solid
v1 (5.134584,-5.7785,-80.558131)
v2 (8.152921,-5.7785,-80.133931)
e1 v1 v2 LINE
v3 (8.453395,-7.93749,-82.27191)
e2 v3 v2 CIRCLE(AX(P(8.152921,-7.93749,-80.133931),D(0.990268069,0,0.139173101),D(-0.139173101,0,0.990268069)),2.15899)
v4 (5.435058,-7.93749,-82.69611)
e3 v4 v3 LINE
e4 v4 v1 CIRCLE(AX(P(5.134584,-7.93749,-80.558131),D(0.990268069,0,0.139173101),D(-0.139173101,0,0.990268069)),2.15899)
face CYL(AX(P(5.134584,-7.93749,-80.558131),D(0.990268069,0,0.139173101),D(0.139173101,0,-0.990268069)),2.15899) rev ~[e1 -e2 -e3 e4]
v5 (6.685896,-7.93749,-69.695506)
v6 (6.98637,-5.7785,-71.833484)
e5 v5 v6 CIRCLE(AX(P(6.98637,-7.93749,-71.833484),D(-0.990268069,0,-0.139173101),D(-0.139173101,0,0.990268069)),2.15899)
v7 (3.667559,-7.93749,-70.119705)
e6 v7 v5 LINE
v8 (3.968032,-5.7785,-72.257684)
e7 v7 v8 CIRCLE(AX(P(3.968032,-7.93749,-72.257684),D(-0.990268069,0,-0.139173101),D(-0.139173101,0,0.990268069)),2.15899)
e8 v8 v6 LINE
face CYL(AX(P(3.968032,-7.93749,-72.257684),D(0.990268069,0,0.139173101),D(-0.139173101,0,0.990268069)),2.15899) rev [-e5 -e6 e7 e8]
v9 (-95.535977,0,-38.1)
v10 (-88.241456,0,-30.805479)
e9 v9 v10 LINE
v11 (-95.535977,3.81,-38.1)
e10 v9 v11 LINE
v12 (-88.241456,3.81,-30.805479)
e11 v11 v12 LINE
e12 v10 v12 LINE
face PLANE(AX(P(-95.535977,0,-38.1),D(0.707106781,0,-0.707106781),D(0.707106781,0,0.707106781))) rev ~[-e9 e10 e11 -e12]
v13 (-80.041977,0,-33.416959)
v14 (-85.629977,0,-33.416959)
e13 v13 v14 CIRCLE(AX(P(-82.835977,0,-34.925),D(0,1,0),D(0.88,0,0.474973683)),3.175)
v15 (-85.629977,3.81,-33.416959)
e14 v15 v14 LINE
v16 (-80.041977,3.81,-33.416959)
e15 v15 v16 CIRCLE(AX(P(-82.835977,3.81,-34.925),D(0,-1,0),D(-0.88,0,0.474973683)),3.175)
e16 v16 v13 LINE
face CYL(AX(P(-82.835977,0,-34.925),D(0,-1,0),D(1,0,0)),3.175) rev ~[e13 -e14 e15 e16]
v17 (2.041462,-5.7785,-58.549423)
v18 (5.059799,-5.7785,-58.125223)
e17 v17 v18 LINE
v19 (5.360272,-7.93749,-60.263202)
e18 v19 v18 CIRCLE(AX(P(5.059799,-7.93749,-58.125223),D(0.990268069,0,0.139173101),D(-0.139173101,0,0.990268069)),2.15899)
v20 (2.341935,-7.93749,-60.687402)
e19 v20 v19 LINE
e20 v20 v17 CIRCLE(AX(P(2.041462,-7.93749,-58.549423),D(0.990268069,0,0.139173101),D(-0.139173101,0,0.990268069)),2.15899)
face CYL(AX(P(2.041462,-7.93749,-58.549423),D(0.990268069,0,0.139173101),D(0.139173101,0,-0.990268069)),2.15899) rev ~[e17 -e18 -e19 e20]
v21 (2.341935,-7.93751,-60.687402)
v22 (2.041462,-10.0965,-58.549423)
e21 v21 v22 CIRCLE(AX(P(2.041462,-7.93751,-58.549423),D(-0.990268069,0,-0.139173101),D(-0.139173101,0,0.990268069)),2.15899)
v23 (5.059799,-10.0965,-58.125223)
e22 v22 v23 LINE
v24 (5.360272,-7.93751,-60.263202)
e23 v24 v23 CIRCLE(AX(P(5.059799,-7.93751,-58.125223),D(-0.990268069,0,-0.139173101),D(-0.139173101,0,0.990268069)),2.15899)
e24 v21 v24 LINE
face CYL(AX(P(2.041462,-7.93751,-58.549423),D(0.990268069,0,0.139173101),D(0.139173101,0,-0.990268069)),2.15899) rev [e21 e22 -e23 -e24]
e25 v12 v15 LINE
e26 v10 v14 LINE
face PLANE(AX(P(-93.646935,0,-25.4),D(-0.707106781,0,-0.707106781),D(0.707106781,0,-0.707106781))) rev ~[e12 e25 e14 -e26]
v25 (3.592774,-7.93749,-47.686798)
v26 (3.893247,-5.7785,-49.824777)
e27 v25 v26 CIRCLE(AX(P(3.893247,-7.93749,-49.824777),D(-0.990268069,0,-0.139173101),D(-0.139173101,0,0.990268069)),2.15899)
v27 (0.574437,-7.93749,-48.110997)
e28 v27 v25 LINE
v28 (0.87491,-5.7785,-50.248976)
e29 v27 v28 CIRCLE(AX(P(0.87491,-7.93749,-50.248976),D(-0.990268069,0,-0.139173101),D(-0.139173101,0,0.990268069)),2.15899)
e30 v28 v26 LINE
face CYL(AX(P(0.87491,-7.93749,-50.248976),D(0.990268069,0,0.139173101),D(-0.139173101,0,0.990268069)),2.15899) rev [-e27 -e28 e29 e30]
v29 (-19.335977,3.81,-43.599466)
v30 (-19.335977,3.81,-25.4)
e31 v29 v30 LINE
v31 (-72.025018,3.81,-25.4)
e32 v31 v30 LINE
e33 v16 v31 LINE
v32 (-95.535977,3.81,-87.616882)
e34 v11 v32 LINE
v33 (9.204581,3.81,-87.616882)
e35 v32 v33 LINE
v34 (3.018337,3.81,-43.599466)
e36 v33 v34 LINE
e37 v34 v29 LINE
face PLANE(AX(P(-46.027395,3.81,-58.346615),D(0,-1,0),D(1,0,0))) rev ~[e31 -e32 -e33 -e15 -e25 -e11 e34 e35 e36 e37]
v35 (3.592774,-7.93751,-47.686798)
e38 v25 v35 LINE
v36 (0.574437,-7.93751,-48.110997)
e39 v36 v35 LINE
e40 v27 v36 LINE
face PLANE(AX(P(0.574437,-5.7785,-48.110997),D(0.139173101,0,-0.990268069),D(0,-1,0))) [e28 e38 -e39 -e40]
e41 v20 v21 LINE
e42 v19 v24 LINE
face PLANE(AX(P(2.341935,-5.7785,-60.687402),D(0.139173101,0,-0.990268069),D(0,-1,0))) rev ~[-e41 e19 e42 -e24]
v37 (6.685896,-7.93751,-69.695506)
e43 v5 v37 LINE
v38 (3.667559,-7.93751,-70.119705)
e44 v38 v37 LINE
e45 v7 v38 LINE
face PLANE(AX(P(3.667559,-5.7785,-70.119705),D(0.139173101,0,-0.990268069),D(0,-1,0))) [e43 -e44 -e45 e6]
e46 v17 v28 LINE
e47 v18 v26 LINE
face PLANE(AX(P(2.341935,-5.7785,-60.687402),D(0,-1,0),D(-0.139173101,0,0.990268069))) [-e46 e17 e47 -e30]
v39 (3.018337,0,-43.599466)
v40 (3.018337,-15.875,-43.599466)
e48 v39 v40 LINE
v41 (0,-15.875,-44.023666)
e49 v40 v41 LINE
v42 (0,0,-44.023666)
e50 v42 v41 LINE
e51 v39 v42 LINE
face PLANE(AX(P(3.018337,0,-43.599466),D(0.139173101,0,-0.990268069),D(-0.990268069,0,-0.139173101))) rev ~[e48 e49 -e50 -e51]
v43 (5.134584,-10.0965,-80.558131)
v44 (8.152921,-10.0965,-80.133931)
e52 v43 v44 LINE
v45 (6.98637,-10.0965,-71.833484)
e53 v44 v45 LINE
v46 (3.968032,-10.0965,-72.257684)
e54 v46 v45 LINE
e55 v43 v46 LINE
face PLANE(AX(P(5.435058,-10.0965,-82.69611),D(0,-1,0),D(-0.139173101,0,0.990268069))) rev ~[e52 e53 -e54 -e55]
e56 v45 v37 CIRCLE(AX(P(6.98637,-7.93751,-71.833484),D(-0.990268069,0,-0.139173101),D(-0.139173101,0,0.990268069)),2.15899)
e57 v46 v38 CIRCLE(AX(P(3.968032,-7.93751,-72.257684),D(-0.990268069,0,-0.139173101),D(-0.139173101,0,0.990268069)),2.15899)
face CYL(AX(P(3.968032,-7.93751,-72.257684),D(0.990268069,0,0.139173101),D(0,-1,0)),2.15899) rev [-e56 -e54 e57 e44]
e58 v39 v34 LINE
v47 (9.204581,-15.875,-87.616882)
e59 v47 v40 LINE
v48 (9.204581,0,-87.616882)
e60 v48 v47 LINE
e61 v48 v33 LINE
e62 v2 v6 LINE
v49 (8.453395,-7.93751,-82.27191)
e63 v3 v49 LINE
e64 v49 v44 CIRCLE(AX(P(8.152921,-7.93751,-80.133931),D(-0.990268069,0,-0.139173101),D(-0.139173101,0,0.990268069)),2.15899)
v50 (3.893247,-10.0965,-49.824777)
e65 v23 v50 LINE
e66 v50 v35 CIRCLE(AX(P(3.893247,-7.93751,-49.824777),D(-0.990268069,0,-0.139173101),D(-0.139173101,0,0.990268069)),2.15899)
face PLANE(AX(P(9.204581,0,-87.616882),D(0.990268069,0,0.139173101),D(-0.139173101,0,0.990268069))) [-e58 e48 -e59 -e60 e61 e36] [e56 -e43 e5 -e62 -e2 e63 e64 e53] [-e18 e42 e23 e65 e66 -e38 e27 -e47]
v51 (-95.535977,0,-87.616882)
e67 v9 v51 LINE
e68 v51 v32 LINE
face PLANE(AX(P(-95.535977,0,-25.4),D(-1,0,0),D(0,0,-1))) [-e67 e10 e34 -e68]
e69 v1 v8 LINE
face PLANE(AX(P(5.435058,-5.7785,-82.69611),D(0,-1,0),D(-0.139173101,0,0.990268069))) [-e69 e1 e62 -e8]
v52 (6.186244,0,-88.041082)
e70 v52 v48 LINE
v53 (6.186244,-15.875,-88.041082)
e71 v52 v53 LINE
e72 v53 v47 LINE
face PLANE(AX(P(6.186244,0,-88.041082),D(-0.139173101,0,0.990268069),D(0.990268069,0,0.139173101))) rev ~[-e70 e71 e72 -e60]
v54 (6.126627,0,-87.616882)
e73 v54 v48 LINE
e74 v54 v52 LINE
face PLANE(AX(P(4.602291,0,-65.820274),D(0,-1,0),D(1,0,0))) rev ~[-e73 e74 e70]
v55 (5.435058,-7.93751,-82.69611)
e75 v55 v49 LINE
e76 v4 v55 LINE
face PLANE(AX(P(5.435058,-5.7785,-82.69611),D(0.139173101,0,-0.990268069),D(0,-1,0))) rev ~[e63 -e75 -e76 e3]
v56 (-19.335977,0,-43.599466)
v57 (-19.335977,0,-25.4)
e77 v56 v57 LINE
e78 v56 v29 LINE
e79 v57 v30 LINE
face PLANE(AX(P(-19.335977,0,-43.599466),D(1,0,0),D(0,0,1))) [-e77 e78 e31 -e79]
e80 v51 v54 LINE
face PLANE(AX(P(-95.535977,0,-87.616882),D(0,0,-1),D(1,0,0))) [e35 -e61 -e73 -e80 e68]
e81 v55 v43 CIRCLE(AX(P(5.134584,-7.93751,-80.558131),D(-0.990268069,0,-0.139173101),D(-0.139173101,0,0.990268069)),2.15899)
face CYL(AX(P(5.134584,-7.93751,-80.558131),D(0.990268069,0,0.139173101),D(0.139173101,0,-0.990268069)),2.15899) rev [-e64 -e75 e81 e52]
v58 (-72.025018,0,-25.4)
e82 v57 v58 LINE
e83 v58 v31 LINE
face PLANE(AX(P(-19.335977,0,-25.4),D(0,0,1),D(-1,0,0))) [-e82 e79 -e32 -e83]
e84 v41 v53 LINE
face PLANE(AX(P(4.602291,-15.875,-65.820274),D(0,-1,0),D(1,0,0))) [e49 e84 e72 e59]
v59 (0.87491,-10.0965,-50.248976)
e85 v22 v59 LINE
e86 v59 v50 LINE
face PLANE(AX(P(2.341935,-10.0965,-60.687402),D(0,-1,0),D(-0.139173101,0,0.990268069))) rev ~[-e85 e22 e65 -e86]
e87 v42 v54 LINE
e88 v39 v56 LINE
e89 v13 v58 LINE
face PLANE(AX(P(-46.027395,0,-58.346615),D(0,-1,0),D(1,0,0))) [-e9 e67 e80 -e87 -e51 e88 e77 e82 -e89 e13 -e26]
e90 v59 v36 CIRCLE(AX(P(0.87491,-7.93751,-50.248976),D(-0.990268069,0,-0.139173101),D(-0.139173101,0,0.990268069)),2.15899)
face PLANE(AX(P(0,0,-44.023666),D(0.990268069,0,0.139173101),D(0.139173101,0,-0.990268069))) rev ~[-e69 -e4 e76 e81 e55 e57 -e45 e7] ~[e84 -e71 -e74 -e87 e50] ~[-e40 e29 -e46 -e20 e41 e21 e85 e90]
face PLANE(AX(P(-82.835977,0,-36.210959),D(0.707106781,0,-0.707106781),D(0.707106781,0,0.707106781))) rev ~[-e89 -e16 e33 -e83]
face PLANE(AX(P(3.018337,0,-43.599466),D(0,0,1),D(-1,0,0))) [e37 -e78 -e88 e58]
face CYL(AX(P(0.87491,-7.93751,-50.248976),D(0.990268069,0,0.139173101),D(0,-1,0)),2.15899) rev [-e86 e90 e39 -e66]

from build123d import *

# Parameters (mm, degrees)
F1_DEPTH  = 15.875
F2_W      = 4.318
F2_H      = 12.7
F3_DEPTH  = 9.175040233
F4_R      = 2.15899
F5_R      = 3.175
F6_DEPTH  = 3.81
F8_DEPTH  = 25.4
F10_DEPTH = 25.4


# Not quite as in the source:
# - a fillet or chamfer is up to 0.001 mm smaller than in the source, because OpenCascade refuses the exact size


with BuildPart() as f1:
    # F0 (on Front) → F1 (new body)
    with BuildSketch(Plane.XZ):
        Polygon((9.2045814112, -87.6168819653), (3.0183370735, -43.5994663098), (0, -44.0236659215), (6.1862443377, -88.041081577), align=None)
    extrude(amount=F1_DEPTH)

    # F2 (on face) → F3 (cut, through all)
    with BuildSketch(Plane(origin=(-6.067283434, 0, -0.8527010782), x_dir=(0, -1, 0), z_dir=(-0.9902680687, 0, -0.139173101))):
        with Locations((7.9375, -54.072730631)):
            Rectangle(F2_W, F2_H)
        with Locations((7.9375, -76.297730631)):
            Rectangle(F2_W, F2_H)
    extrude(amount=-F3_DEPTH, mode=Mode.SUBTRACT)

    # F4 (radius 2.159 in the source; OpenCascade refuses exactly that, so slightly less here)
    f4_edges = [f1.edges().sort_by_distance(p)[0] for p in [
        (2.083606, -5.7785, -47.898898),
        (5.176728, -5.7785, -69.907605),
        (5.176728, -10.0965, -69.907605),
        (2.083606, -10.0965, -47.898898),
        (3.851104, -10.0965, -60.475302),
        (6.944226, -10.0965, -82.48401),
        (6.944226, -5.7785, -82.48401),
        (3.851104, -5.7785, -60.475302),
    ]]
    fillet(f4_edges, radius=F4_R)

    # F5 (on Front) → F6 (join)
    with BuildSketch(Plane.XZ):
        Polygon((9.2045814112, -87.6168819653), (3.0183370735, -43.5994663098), (-19.3359767612, -43.5994663098), (-19.3359767612, -25.4), (-95.5359767612, -25.4), (-95.5359767612, -87.6168819653), align=None)
        with Locations((-82.8359767612, -34.925)):
            Circle(F5_R, mode=Mode.SUBTRACT)
    extrude(amount=-F6_DEPTH)

    # F7 (on Front) → F8 (cut)
    with BuildSketch(Plane.XZ):
        Polygon((-95.5359767612, -25.4), (-95.5359767612, -38.1), (-82.8359767612, -25.4), align=None)
    extrude(amount=-F8_DEPTH, mode=Mode.SUBTRACT)

    # F9 (on Front) → F10 (cut)
    with BuildSketch(Plane.XZ):
        Polygon((-70.1359767612, -23.5109585549), (-72.0250182062, -25.4), (-70.1359767612, -25.4), align=None)
        Polygon((-93.6469353161, -25.4), (-82.8359767612, -36.2109585549), (-72.0250182062, -25.4), align=None)
    extrude(amount=-F10_DEPTH, mode=Mode.SUBTRACT)


solid = f1.part
